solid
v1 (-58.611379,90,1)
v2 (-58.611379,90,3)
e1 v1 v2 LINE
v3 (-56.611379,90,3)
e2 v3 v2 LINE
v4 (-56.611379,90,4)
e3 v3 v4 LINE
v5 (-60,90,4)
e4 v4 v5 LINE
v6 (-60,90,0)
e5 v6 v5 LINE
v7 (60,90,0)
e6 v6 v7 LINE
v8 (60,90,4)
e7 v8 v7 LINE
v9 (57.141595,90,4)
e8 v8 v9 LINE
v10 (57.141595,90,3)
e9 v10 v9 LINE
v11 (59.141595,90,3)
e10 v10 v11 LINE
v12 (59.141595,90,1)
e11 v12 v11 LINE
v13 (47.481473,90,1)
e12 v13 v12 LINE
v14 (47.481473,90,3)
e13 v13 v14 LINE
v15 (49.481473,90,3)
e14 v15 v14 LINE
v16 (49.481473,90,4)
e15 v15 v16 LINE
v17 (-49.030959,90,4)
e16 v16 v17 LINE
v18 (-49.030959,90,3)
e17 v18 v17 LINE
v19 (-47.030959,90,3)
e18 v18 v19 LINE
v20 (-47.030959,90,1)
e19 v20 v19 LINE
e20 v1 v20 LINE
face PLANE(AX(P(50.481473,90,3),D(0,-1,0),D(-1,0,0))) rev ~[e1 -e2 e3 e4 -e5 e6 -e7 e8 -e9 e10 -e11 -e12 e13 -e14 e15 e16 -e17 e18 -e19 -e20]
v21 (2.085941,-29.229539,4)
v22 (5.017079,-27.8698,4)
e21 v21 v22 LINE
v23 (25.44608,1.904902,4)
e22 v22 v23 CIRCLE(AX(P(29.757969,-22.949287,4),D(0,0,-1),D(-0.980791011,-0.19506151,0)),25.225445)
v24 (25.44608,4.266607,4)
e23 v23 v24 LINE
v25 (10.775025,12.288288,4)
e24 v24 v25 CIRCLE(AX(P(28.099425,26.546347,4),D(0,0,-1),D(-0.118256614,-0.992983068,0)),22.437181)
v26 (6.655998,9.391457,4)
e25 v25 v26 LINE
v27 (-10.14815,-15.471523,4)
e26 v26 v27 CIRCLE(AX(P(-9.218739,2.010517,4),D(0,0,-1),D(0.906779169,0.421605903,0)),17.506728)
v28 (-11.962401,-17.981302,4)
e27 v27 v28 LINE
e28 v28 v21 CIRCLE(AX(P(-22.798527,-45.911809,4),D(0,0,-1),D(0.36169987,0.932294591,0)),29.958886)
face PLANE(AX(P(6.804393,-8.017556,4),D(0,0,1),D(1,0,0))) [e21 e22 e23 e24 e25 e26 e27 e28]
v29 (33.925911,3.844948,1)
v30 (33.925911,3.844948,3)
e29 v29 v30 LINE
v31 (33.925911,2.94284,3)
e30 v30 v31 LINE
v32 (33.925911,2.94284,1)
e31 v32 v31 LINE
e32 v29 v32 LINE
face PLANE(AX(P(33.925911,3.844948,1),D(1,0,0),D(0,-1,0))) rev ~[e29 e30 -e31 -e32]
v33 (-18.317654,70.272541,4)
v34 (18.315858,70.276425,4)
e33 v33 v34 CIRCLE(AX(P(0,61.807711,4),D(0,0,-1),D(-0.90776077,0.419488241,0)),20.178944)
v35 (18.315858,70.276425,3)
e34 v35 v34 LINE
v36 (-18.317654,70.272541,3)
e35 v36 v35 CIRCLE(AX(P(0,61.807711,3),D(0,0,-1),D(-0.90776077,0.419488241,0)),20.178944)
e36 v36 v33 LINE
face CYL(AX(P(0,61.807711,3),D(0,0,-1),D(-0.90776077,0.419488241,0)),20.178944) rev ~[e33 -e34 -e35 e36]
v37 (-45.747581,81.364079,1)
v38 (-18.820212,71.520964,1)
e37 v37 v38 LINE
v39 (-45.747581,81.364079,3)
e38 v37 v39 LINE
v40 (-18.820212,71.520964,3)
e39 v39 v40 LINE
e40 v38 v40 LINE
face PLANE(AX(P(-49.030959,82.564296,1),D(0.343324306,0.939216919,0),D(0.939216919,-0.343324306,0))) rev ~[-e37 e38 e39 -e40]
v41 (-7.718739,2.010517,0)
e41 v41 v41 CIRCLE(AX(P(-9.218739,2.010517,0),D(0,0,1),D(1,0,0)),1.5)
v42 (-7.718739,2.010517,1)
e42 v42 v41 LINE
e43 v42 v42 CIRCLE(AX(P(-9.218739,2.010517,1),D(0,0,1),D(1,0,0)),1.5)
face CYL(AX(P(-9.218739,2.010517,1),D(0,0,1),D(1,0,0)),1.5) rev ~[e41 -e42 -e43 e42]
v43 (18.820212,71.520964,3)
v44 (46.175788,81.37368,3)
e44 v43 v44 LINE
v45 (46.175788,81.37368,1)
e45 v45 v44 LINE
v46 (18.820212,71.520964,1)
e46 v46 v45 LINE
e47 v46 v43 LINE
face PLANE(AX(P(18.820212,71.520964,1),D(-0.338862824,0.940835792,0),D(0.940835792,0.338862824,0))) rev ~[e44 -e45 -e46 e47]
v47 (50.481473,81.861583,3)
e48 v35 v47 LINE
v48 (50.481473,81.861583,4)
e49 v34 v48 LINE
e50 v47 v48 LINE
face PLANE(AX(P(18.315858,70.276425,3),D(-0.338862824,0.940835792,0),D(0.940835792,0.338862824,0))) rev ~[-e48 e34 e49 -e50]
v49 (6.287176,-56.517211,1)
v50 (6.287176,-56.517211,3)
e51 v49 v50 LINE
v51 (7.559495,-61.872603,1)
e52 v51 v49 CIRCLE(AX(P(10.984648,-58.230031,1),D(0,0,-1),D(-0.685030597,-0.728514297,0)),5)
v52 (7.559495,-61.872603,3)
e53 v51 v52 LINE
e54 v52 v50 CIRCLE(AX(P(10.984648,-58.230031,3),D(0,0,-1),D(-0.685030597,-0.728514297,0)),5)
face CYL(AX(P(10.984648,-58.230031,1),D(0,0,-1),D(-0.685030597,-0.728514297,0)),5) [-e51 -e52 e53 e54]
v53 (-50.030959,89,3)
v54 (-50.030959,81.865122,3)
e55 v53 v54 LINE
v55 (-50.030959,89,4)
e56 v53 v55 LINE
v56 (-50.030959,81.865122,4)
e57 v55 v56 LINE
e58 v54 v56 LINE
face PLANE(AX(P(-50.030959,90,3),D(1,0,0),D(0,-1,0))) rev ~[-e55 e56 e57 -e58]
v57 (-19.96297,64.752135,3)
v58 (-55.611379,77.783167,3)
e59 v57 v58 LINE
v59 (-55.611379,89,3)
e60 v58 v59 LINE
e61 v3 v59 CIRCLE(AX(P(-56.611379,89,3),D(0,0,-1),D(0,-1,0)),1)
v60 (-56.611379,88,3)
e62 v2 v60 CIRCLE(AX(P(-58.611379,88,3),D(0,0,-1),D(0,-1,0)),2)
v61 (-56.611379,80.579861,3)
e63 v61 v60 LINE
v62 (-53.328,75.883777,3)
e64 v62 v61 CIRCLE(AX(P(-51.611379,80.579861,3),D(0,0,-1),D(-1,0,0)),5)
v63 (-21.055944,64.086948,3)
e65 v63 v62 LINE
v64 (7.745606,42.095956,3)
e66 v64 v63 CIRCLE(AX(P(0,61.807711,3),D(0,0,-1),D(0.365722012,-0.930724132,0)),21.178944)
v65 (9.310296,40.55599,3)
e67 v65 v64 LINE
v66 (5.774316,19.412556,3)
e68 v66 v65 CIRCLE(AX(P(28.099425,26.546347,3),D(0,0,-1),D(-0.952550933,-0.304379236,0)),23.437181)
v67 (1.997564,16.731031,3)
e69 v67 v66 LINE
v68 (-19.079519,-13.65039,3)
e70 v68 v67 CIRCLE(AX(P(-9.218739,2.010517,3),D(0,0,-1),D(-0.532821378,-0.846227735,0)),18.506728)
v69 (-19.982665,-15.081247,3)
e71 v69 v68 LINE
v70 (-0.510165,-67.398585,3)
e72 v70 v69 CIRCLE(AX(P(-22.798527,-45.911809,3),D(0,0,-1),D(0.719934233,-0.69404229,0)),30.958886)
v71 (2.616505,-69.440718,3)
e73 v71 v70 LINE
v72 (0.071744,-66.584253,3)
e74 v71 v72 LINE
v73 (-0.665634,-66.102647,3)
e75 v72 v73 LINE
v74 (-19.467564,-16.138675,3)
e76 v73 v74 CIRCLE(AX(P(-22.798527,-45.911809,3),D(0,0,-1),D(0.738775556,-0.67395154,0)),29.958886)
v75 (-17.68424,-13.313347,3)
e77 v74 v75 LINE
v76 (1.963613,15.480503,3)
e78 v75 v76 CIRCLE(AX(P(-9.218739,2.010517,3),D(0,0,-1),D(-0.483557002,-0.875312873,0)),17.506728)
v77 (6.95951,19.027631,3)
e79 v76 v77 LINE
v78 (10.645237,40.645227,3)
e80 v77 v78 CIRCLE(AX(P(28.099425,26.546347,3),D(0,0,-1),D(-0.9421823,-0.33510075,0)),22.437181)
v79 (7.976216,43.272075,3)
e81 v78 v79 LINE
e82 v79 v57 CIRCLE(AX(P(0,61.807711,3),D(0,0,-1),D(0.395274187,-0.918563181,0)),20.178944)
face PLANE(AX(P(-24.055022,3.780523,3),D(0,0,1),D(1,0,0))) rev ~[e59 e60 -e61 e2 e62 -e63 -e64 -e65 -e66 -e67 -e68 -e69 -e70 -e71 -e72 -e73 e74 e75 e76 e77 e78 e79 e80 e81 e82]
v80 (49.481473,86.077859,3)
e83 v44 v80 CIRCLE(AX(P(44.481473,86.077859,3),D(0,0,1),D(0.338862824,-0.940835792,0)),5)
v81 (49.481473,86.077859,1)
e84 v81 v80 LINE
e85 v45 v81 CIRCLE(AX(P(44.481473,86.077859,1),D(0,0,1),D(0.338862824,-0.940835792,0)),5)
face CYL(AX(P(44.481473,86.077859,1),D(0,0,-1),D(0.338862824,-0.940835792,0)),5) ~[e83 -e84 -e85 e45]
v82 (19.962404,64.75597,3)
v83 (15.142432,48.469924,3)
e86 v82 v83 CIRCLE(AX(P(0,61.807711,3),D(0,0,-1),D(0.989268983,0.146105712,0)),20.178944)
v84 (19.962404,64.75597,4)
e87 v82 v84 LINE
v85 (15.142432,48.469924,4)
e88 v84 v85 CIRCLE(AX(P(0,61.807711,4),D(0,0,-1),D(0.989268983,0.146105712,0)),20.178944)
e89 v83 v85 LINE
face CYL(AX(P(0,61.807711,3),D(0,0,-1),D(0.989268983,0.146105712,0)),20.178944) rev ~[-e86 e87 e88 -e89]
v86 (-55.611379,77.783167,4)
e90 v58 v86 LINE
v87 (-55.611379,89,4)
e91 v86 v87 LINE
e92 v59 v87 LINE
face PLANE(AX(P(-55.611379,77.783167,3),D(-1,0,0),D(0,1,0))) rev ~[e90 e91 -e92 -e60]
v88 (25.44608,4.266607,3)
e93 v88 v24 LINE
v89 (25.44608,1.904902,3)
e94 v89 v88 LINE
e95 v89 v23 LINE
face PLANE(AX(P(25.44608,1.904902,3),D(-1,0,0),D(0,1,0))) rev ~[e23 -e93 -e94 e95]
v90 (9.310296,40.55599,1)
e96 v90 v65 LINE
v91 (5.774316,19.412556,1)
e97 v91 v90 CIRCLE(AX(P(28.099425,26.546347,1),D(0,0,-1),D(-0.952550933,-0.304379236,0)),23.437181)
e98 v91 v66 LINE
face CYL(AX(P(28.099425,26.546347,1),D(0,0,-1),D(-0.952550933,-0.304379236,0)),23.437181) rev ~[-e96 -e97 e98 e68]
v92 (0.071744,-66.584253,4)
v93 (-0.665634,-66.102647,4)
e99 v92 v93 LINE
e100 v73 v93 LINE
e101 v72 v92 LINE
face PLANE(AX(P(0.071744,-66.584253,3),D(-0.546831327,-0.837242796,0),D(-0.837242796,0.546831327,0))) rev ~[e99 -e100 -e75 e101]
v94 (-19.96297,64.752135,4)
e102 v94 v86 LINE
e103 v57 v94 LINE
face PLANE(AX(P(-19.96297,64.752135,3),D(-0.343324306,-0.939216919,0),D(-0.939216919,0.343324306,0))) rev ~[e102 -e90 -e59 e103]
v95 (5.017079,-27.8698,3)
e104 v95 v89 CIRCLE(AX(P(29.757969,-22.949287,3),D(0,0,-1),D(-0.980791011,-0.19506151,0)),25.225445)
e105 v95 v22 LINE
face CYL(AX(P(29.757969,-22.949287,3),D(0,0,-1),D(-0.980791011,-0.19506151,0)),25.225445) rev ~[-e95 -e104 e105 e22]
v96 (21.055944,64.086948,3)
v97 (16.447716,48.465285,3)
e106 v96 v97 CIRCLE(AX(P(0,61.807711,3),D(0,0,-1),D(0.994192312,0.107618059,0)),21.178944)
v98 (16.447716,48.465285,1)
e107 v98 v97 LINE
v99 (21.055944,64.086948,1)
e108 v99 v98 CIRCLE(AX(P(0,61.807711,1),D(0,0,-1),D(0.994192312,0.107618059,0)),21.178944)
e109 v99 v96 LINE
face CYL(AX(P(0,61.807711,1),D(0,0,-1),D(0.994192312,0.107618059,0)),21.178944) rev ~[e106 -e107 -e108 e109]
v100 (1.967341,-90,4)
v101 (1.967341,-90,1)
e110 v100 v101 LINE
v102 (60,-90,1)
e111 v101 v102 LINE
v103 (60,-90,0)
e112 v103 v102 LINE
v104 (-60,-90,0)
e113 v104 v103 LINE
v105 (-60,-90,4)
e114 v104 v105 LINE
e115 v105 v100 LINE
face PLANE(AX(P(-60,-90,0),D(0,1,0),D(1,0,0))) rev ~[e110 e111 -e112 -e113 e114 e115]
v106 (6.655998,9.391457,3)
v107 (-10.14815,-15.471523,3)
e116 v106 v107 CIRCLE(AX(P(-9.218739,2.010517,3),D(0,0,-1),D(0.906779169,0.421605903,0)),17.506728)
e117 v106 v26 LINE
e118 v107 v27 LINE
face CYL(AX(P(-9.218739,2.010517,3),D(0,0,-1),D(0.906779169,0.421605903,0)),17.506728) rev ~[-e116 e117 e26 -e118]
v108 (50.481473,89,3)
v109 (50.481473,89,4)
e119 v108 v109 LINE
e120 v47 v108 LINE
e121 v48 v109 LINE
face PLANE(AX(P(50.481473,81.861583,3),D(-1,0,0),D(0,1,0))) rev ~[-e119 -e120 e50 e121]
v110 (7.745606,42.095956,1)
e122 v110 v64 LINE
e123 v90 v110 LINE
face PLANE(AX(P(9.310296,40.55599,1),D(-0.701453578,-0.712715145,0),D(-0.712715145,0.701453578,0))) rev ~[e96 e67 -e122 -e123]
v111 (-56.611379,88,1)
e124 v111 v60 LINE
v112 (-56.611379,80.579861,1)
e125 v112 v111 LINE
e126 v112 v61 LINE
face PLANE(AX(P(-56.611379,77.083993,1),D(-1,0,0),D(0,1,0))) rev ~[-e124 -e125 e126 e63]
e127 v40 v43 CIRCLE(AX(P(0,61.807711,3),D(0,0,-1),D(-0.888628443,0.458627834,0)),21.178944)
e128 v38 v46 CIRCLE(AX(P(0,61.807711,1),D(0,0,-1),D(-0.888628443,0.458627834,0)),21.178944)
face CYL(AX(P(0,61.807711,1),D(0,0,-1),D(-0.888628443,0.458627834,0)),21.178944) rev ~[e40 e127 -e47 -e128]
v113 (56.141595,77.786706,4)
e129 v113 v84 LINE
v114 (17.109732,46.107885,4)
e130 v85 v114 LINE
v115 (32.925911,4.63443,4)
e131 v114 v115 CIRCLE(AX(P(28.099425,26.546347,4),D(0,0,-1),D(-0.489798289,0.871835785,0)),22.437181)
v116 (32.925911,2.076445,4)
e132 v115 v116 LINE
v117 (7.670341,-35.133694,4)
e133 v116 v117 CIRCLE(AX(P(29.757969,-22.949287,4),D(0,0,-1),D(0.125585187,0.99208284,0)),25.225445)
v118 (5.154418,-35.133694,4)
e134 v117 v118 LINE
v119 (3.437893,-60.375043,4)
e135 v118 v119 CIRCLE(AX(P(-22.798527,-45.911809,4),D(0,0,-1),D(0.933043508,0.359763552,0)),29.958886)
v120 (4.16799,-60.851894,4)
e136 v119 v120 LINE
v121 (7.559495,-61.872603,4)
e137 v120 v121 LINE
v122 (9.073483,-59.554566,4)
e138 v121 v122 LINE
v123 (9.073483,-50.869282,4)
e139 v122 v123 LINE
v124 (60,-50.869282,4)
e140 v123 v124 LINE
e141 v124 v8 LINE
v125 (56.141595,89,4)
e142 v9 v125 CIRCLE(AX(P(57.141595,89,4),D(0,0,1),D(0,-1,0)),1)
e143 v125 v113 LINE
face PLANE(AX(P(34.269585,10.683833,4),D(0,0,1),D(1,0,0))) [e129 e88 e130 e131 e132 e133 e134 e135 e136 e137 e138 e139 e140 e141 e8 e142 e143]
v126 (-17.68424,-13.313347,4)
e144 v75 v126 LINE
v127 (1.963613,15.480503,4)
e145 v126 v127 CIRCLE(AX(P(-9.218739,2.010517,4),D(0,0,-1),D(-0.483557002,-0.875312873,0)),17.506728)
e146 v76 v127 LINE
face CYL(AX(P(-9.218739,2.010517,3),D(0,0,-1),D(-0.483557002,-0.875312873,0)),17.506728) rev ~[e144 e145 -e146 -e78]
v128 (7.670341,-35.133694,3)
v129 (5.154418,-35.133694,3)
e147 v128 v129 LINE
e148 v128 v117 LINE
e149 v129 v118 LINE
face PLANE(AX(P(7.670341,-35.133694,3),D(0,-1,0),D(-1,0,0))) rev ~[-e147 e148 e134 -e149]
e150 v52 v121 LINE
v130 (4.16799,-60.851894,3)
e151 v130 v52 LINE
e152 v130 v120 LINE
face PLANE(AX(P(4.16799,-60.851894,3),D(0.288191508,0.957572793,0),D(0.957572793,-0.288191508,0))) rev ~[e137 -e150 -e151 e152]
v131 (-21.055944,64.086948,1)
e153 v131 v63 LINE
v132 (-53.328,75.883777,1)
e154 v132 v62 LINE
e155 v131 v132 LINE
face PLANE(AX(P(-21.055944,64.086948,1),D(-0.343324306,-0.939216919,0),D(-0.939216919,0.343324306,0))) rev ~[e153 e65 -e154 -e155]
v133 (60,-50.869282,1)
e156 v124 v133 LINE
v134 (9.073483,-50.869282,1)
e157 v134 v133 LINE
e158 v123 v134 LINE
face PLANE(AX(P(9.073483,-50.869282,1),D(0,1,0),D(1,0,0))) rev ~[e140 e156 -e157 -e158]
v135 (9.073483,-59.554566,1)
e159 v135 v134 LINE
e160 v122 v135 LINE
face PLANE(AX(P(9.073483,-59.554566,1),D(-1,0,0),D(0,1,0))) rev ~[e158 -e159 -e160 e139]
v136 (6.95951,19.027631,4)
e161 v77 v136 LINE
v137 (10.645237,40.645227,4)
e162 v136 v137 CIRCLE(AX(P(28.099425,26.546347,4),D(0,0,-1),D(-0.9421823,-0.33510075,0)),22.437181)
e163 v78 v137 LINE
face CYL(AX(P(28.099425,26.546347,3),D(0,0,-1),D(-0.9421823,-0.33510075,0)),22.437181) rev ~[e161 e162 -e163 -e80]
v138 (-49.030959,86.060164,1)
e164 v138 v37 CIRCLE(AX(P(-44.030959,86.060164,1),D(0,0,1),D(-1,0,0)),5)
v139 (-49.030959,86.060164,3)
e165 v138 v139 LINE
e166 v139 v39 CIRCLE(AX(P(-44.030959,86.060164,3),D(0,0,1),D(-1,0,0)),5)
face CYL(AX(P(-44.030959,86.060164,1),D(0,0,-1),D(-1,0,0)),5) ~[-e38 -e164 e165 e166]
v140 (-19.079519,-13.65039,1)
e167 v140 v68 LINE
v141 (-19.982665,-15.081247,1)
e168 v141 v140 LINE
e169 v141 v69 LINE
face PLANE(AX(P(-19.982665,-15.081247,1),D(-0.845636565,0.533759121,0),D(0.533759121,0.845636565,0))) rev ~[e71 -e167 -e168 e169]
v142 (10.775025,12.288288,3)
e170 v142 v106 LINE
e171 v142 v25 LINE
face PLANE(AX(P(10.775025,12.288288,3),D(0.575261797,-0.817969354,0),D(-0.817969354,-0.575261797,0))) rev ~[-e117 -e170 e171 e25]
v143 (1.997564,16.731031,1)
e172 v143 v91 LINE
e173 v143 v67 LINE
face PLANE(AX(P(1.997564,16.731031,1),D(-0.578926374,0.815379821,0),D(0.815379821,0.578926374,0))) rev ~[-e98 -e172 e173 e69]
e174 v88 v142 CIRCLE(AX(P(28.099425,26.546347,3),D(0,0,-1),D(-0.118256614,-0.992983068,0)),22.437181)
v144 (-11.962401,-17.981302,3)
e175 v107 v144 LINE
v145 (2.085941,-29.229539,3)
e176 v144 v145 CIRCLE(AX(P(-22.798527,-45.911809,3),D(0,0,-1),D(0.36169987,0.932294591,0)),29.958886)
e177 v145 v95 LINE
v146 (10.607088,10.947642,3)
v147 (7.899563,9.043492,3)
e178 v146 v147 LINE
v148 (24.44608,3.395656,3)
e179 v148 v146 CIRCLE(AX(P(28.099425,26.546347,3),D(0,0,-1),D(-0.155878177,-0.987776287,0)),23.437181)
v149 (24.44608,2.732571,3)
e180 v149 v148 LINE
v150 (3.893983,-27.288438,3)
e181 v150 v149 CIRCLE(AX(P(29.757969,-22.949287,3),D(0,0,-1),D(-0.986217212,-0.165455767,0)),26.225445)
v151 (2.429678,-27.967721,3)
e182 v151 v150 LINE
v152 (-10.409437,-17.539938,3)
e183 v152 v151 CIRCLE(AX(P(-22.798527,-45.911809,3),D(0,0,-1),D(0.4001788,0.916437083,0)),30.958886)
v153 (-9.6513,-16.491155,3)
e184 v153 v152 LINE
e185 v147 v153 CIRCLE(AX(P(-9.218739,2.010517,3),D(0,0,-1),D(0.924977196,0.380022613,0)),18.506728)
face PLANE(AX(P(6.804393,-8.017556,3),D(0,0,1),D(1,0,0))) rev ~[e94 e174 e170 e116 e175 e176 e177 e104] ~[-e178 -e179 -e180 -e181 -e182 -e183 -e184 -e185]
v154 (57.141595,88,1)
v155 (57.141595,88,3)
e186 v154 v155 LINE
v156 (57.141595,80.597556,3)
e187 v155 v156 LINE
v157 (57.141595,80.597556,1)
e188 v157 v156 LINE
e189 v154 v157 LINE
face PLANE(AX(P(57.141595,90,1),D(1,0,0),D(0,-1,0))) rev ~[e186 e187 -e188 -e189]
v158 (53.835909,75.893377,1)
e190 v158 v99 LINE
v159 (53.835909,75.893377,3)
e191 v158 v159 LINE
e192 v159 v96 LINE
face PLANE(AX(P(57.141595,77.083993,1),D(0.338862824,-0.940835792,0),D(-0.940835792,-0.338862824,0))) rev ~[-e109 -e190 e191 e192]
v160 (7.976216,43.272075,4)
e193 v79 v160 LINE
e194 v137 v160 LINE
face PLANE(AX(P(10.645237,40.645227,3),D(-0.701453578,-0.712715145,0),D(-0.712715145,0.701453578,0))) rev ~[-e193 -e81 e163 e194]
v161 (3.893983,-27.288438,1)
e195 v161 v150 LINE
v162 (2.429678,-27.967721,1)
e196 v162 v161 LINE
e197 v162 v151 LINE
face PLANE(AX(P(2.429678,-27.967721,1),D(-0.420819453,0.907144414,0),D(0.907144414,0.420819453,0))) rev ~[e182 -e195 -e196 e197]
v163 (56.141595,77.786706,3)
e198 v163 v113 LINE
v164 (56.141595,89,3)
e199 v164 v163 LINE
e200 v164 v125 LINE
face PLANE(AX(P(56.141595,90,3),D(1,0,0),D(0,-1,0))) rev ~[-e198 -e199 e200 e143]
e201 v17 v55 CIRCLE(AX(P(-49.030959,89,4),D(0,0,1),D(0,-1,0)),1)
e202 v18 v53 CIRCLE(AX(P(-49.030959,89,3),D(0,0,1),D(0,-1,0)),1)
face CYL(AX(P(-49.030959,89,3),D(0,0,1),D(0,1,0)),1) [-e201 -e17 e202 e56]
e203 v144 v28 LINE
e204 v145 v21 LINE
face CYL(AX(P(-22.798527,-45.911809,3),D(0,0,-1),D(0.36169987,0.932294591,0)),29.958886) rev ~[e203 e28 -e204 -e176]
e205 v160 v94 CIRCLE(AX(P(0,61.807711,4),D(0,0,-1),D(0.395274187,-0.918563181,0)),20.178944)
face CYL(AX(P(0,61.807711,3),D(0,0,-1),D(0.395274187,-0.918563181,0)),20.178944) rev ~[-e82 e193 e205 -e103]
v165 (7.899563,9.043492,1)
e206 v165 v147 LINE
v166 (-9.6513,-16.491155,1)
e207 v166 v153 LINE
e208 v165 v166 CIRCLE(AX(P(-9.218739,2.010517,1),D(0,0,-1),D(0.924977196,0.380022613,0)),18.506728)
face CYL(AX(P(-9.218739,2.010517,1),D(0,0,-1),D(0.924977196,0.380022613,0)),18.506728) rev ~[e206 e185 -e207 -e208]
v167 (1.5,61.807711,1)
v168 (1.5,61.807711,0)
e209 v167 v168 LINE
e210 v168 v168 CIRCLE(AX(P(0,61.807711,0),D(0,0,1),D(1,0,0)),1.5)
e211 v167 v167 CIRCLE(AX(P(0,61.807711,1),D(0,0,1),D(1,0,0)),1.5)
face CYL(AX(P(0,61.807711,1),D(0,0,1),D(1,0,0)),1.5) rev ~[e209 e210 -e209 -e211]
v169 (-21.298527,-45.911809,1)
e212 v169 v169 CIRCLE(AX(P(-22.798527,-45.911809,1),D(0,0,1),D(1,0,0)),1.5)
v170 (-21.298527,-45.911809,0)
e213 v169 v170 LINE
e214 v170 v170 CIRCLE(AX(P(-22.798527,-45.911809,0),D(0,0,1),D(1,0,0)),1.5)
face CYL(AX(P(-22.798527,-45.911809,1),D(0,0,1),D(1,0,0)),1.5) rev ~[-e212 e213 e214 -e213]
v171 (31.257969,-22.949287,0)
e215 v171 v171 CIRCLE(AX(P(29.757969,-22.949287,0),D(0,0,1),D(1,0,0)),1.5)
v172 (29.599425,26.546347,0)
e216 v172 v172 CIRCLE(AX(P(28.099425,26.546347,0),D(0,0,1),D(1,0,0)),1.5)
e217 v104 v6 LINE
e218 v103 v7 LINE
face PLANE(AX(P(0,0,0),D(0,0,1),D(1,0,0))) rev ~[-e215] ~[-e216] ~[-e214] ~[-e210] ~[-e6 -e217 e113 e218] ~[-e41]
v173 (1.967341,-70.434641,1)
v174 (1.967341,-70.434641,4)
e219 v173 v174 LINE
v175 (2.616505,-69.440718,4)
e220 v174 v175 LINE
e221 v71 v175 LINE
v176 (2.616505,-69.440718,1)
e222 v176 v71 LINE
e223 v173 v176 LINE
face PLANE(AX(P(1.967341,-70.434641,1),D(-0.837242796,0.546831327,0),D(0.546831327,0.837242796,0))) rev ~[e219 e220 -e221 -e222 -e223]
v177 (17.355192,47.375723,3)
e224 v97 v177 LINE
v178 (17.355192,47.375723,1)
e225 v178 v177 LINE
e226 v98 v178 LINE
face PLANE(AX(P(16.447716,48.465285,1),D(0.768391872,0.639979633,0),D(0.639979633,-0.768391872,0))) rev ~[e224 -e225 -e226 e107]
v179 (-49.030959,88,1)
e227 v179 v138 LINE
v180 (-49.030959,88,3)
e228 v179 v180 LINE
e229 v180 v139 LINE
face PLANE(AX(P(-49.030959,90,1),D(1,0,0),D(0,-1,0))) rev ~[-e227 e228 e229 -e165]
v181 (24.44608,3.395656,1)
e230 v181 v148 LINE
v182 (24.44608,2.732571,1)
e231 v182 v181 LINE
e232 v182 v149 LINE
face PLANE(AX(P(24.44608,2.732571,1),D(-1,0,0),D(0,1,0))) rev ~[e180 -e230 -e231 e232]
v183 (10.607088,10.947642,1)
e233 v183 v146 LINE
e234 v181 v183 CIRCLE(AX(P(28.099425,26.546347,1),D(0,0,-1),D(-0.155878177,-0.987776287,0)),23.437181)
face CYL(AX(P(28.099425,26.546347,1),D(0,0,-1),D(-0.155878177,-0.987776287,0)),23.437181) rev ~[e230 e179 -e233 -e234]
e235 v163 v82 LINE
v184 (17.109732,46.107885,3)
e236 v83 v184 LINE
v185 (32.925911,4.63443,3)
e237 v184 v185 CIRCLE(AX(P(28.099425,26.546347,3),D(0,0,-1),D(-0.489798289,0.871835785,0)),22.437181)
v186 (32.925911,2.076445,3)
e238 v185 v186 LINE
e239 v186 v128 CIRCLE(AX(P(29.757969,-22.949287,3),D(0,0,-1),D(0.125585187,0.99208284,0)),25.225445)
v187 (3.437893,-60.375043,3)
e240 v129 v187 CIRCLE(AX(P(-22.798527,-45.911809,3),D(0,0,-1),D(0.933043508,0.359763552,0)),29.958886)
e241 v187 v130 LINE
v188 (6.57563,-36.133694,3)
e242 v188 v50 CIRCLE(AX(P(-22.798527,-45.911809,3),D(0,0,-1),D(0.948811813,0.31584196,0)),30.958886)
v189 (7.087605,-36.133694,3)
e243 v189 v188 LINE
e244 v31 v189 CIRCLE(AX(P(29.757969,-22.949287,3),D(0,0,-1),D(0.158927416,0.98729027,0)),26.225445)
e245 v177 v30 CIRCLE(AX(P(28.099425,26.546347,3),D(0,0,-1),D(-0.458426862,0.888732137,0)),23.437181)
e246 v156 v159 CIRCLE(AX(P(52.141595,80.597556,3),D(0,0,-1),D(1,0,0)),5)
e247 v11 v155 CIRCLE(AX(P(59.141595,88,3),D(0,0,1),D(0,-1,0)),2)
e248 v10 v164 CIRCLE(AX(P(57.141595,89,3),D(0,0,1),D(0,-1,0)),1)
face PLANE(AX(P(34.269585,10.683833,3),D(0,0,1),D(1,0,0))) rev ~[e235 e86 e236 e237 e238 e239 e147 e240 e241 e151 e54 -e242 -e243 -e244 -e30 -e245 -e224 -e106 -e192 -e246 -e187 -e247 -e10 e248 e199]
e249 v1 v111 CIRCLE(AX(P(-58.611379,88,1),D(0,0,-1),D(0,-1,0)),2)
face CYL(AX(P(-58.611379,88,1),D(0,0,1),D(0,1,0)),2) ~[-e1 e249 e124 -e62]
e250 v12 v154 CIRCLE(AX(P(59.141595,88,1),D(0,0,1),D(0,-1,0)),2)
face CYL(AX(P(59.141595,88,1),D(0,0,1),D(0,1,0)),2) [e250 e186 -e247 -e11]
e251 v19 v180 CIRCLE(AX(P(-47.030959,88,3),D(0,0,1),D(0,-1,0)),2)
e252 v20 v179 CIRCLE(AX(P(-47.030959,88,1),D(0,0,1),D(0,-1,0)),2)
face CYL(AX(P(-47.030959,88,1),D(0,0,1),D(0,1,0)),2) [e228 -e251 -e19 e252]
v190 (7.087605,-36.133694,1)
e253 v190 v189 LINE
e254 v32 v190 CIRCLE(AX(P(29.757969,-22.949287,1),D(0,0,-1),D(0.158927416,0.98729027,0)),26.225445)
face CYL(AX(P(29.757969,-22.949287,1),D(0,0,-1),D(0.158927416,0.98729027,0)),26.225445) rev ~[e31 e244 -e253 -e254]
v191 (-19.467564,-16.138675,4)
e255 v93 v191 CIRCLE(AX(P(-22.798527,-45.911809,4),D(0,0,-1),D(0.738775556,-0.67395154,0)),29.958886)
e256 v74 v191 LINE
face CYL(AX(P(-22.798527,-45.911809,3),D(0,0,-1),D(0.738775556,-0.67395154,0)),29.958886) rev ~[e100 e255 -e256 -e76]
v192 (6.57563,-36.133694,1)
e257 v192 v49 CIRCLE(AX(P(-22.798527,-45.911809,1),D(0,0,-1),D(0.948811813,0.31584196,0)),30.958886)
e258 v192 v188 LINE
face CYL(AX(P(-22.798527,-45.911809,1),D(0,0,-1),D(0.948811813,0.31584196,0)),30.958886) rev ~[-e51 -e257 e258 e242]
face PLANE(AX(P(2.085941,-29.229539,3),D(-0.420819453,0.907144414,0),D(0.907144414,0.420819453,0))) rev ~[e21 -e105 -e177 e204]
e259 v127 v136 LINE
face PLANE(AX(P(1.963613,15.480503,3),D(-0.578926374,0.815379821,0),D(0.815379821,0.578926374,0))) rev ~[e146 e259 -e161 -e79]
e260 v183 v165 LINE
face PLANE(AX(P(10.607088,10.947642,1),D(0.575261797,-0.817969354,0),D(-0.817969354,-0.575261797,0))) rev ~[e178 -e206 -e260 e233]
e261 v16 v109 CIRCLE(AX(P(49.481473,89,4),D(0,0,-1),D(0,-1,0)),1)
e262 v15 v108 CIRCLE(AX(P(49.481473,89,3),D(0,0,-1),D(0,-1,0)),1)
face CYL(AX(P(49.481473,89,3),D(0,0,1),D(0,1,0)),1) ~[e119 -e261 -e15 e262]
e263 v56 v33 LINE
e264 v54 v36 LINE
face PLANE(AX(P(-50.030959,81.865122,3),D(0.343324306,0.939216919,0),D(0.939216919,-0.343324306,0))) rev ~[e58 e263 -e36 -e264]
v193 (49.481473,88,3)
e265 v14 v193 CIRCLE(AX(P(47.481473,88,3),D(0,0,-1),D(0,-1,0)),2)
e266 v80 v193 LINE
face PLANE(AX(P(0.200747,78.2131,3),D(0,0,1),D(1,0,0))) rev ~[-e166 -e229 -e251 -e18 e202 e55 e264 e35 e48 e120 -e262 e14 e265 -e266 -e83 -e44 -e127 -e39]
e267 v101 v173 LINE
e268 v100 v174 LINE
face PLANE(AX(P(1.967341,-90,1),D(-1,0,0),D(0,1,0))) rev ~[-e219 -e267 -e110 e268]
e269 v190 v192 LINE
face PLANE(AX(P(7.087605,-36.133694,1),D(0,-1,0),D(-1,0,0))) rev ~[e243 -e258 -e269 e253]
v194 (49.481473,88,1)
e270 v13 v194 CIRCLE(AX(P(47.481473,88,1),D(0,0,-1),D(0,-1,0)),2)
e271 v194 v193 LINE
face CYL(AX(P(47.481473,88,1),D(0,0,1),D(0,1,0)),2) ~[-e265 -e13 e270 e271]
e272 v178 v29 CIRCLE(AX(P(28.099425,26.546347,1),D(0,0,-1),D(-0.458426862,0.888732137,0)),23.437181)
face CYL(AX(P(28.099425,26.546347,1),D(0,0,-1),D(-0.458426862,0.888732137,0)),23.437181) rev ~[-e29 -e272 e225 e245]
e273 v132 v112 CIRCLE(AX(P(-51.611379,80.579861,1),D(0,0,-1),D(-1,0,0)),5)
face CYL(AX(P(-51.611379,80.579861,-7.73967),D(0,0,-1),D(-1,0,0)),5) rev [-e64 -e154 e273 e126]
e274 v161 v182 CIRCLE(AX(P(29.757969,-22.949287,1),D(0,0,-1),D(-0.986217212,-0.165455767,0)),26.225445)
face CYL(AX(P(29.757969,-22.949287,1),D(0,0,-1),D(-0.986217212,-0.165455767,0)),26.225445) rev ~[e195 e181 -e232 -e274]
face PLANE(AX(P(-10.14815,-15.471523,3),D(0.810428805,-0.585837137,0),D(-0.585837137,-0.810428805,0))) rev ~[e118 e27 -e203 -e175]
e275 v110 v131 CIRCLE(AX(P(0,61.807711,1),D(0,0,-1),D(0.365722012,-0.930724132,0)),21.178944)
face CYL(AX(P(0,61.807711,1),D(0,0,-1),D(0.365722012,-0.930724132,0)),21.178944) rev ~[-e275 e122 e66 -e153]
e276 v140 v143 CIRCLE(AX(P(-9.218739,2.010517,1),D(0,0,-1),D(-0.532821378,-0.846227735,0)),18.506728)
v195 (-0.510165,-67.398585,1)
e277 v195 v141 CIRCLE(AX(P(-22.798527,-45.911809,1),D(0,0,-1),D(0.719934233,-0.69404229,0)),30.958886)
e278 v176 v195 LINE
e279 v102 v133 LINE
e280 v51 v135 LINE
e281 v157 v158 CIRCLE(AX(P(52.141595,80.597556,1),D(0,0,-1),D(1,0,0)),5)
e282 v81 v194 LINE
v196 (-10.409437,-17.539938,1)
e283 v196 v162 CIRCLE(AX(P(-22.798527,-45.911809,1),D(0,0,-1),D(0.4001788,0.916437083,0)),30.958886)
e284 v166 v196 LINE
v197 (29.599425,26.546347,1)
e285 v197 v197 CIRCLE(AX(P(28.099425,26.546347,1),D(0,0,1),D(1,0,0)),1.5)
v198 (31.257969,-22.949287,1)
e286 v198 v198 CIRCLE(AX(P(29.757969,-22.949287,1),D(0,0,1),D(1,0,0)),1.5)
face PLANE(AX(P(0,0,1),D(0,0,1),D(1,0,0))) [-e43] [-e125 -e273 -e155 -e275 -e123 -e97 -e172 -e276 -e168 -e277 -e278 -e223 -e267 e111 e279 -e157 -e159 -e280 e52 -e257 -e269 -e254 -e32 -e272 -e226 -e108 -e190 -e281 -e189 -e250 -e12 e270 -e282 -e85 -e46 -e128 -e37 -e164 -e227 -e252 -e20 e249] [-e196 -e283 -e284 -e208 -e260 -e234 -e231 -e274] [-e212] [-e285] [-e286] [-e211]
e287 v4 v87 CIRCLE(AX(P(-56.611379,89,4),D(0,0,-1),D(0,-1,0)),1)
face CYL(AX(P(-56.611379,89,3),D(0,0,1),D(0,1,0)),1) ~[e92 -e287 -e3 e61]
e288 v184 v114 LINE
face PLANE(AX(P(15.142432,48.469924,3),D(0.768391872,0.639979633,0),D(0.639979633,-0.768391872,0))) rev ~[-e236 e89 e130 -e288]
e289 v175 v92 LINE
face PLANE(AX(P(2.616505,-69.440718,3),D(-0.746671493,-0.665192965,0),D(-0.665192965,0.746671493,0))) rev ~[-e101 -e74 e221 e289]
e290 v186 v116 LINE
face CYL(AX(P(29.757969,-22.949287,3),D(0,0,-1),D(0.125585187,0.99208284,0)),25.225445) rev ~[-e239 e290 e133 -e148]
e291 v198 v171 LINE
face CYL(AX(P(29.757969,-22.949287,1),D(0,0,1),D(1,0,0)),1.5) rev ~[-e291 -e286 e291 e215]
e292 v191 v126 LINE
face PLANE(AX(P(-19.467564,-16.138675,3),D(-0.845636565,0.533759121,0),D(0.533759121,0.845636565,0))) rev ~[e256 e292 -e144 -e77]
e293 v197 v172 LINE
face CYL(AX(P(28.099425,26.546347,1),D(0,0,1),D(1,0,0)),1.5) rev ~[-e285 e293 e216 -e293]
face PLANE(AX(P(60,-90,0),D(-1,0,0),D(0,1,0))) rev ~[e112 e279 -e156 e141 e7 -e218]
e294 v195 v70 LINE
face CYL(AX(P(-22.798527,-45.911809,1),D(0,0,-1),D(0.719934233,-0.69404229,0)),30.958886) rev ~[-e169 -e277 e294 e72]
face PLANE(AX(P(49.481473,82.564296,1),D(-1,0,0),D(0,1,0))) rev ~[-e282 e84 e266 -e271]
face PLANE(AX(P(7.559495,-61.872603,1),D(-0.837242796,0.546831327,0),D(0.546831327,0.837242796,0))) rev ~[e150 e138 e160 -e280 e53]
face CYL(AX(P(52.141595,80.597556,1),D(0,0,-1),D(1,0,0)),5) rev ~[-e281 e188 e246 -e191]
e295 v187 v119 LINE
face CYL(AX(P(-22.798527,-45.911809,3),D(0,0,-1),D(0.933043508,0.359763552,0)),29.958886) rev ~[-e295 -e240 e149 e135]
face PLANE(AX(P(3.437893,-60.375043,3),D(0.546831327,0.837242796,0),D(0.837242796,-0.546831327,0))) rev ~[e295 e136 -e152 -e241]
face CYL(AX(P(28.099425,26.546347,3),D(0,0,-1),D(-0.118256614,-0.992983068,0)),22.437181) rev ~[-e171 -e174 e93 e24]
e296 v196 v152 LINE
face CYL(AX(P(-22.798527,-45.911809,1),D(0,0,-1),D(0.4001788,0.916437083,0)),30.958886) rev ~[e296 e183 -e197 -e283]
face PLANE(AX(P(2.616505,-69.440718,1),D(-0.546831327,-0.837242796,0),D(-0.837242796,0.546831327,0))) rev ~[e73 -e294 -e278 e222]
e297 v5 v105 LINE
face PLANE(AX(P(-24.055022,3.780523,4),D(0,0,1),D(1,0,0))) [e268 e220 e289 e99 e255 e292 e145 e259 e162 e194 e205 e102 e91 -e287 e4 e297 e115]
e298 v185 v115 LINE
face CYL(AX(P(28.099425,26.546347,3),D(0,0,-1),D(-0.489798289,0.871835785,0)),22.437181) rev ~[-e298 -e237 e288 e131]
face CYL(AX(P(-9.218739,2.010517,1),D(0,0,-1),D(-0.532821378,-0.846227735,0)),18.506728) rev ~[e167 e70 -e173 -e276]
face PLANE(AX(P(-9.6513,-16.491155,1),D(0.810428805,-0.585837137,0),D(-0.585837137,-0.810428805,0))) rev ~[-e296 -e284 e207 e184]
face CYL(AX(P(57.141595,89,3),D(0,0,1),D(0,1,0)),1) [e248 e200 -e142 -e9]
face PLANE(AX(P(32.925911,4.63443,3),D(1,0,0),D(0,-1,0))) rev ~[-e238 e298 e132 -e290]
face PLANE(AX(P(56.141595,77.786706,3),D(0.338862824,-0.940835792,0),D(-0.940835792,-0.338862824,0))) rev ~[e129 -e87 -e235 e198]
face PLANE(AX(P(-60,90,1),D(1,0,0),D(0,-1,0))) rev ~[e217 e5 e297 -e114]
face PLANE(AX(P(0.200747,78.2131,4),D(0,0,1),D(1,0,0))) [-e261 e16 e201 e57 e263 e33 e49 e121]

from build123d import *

# Parameters (mm, degrees)
F0_W          = 120
F0_H          = 180
F1_DEPTH      = 1
F3_DEPTH      = 2
F4_R          = 1.5
F5_DEPTH      = 1
F7_DEPTH      = 1
F8_R          = 1
F9_R          = 2
F10_T4_DEPTH  = 19.4793405237
F10_T10_DEPTH = 10.7839076458
F10_T12_DEPTH = 2
F10_T14_DEPTH = 2
F10_T16_DEPTH = 2


# Not quite as in the source:
# - a fillet or chamfer that OpenCascade refuses, or shapes differently, is made with other operations: its cross-section is extruded or revolved along the edge and cut away or added


with BuildPart() as f1:
    # F0 (on Top) → F1 (new body)
    with BuildSketch(Plane.XY):
        Rectangle(F0_W, F0_H)
    extrude(amount=F1_DEPTH)

    # F2 (on face) → F3 (join)
    with BuildSketch(Plane.XY.offset(1)):
        with BuildLine():
            ThreePointArc((5.7743163641, 19.4125560874), (4.9832762743, 30.4122392819), (9.3102960102, 40.5559898216))
            Line((9.3102960102, 40.5559898216), (7.7456061238, 42.095956144))
            ThreePointArc((7.7456061238, 42.095956144), (-12.8527116408, 44.9745444723), (-21.0559435865, 64.086947543))
            Line((-21.0559435865, 64.086947543), (-56.6113785743, 77.083993049))
            Line((-56.6113785743, 77.083993049), (-56.6113785743, 90))
            Line((-56.6113785743, 90), (-60, 90))
            Line((-60, 90), (-60, -90))
            Line((-60, -90), (1.9673409406, -90))
            Line((1.9673409406, -90), (1.9673409406, -70.4346411675))
            Line((1.9673409406, -70.4346411675), (2.616505266, -69.4407183096))
            Line((2.616505266, -69.4407183096), (-0.5101646957, -67.3985853814))
            ThreePointArc((-0.5101646957, -67.3985853814), (-51.8128586727, -56.7109367212), (-19.9826654378, -15.0812472939))
            Line((-19.9826654378, -15.0812472939), (-19.0795193014, -13.6503895026))
            ThreePointArc((-19.0795193014, -13.6503895026), (-24.4245614448, 12.5595430325), (1.9975642587, 16.731031054))
            Line((1.9975642587, 16.731031054), (5.7743163641, 19.4125560874))
        make_face()
        with BuildLine():
            ThreePointArc((3.893983022, -27.2884377194), (8.1177507192, -8.1345994764), (24.4460798679, 2.7325712784))
            Line((24.4460798679, 2.7325712784), (24.4460798679, 3.3956557663))
            ThreePointArc((24.4460798679, 3.3956557663), (16.8725336469, 5.9731034829), (10.6070882692, 10.9476419853))
            Line((10.6070882692, 10.9476419853), (7.8995626137, 9.0434923179))
            ThreePointArc((7.8995626137, 9.0434923179), (6.0327541508, -8.4723711354), (-9.6512998226, -16.4911551649))
            Line((-9.6512998226, -16.4911551649), (-10.4094366834, -17.5399380287))
            ThreePointArc((-10.4094366834, -17.5399380287), (-3.2805892037, -21.8805224353), (2.4296782432, -27.9677208929))
            Line((2.4296782432, -27.9677208929), (3.893983022, -27.2884377194))
        make_face()
        with BuildLine():
            Line((57.1415945888, 77.083993049), (21.0559435865, 64.086947543))
            ThreePointArc((21.0559435865, 64.086947543), (20.3135472344, 55.8154256572), (16.4477156209, 48.4652846663))
            Line((16.4477156209, 48.4652846663), (17.3551916053, 47.3757231641))
            ThreePointArc((17.3551916053, 47.3757231641), (50.0032635247, 34.8844107262), (33.9259108744, 3.8449484526))
            Line((33.9259108744, 3.8449484526), (33.9259108744, 2.9428404548))
            ThreePointArc((33.9259108744, 2.9428404548), (51.375757227, -37.7966835864), (7.0876050588, -36.1336939998))
            Line((7.0876050588, -36.1336939998), (6.5756302201, -36.1336939998))
            ThreePointArc((6.5756302201, -36.1336939998), (8.0704516148, -48.269522221), (4.7498989473, -60.0375614629))
            Line((4.7498989473, -60.0375614629), (7.5594950835, -61.8726028504))
            Line((7.5594950835, -61.8726028504), (9.0734828264, -59.5545656979))
            Line((9.0734828264, -59.5545656979), (9.0734828264, -50.869282335))
            Line((9.0734828264, -50.869282335), (60, -50.869282335))
            Line((60, -50.869282335), (60, 90))
            Line((60, 90), (57.1415945888, 90))
            Line((57.1415945888, 90), (57.1415945888, 77.083993049))
        make_face()
        with BuildLine():
            Line((-49.0309594103, 82.5642955171), (-18.820212287, 71.520964019))
            ThreePointArc((-18.820212287, 71.520964019), (0, 82.9866549619), (18.820212287, 71.520964019))
            Line((18.820212287, 71.520964019), (49.4814734299, 82.5642955171))
            Line((49.4814734299, 82.5642955171), (49.4814734299, 90))
            Line((49.4814734299, 90), (-49.0309594103, 90))
            Line((-49.0309594103, 90), (-49.0309594103, 82.5642955171))
        make_face()
    extrude(amount=F3_DEPTH)

    # F4 (on face) → F5 (cut, through all)
    with BuildSketch(Plane.XY.offset(1)):
        with Locations((-9.2187389006, 2.0105171313)):
            Circle(F4_R)
        with Locations((29.7579686112, -22.9492865482)):
            Circle(F4_R)
        with Locations((-22.7985265463, -45.9118092327)):
            Circle(F4_R)
        with Locations((28.0994249015, 26.5463472953)):
            Circle(F4_R)
        with Locations((0, 61.8077106774)):
            Circle(F4_R)
    extrude(amount=-F5_DEPTH, mode=Mode.SUBTRACT)

    # F6 (on face) → F7 (join)
    with BuildSketch(Plane.XY.offset(3)):
        with BuildLine():
            Line((-50.0309594103, 81.8651218962), (-18.3176540037, 70.2725405185))
            ThreePointArc((-18.3176540037, 70.2725405185), (-0.0021397414, 81.9866548485), (18.315858399, 70.2764250748))
            Line((18.315858399, 70.2764250748), (50.4814734299, 81.8615829055))
            Line((50.4814734299, 81.8615829055), (50.4814734299, 89))
            Line((50.4814734299, 89), (50.4814734299, 90))
            Line((50.4814734299, 90), (49.4814734299, 90))
            Line((49.4814734299, 90), (49.4814734299, 82.5642955171))
            Line((49.4814734299, 82.5642955171), (18.820212287, 71.520964019))
            ThreePointArc((18.820212287, 71.520964019), (0, 82.9866549619), (-18.820212287, 71.520964019))
            Line((-18.820212287, 71.520964019), (-49.0309594103, 82.5642955171))
            Line((-49.0309594103, 82.5642955171), (-49.0309594103, 90))
            Line((-49.0309594103, 90), (-50.0309594103, 90))
            Line((-50.0309594103, 90), (-50.0309594103, 89))
            Line((-50.0309594103, 89), (-50.0309594103, 81.8651218962))
        make_face()
        with BuildLine():
            ThreePointArc((-0.6656338746, -66.1026465903), (-50.8378132857, -56.4632664954), (-19.4675641491, -16.1386746862))
            Line((-19.4675641491, -16.1386746862), (-17.6842398721, -13.313347385))
            ThreePointArc((-17.6842398721, -13.313347385), (-23.6796095533, 11.8780776394), (1.9636133622, 15.4805033335))
            Line((1.9636133622, 15.4805033335), (6.9595101943, 19.0276311422))
            ThreePointArc((6.9595101943, 19.0276311422), (5.9814163542, 30.3173928166), (10.6452370769, 40.6452271729))
            Line((10.6452370769, 40.6452271729), (7.9762157892, 43.2720754273))
            ThreePointArc((7.9762157892, 43.2720754273), (-12.2991385331, 45.8101801247), (-19.9629696392, 64.752135175))
            Line((-19.9629696392, 64.752135175), (-55.6113785743, 77.78316667))
            Line((-55.6113785743, 77.78316667), (-55.6113785743, 89))
            Line((-55.6113785743, 89), (-55.6113785743, 90))
            Line((-55.6113785743, 90), (-56.6113785743, 90))
            Line((-56.6113785743, 90), (-56.6113785743, 77.083993049))
            Line((-56.6113785743, 77.083993049), (-21.0559435865, 64.086947543))
            ThreePointArc((-21.0559435865, 64.086947543), (-12.8527116408, 44.9745444723), (7.7456061238, 42.095956144))
            Line((7.7456061238, 42.095956144), (9.3102960102, 40.5559898216))
            ThreePointArc((9.3102960102, 40.5559898216), (4.9832762743, 30.4122392819), (5.7743163641, 19.4125560874))
            Line((5.7743163641, 19.4125560874), (1.9975642587, 16.731031054))
            ThreePointArc((1.9975642587, 16.731031054), (-24.4245614448, 12.5595430325), (-19.0795193014, -13.6503895026))
            Line((-19.0795193014, -13.6503895026), (-19.9826654378, -15.0812472939))
            ThreePointArc((-19.9826654378, -15.0812472939), (-51.8128586727, -56.7109367212), (-0.5101646957, -67.3985853814))
            Line((-0.5101646957, -67.3985853814), (2.616505266, -69.4407183096))
            Line((2.616505266, -69.4407183096), (0.0717437619, -66.5842526346))
            Line((0.0717437619, -66.5842526346), (-0.6656338746, -66.1026465903))
        make_face()
        with BuildLine():
            Line((56.1415945888, 89), (56.1415945888, 77.7867056607))
            Line((56.1415945888, 77.7867056607), (19.9624036934, 64.7559696929))
            ThreePointArc((19.9624036934, 64.7559696929), (19.3493201754, 56.0811409197), (15.142432038, 48.4699243388))
            Line((15.142432038, 48.4699243388), (17.1097320999, 46.1078845188))
            ThreePointArc((17.1097320999, 46.1078845188), (49.0638742633, 34.5412800266), (32.9259108744, 4.6344299996))
            Line((32.9259108744, 4.6344299996), (32.9259108744, 2.0764449012))
            ThreePointArc((32.9259108744, 2.0764449012), (50.6298931929, -37.115650126), (7.6703406758, -35.1336939998))
            Line((7.6703406758, -35.1336939998), (5.1544175427, -35.1336939998))
            ThreePointArc((5.1544175427, -35.1336939998), (7.0913247793, -47.9444525735), (3.4378931049, -60.3750431417))
            Line((3.4378931049, -60.3750431417), (4.1679904898, -60.8518942097))
            Line((4.1679904898, -60.8518942097), (7.5594950835, -61.8726028504))
            Line((7.5594950835, -61.8726028504), (4.7498989473, -60.0375614629))
            ThreePointArc((4.7498989473, -60.0375614629), (8.0704516148, -48.269522221), (6.5756302201, -36.1336939998))
            Line((6.5756302201, -36.1336939998), (7.0876050588, -36.1336939998))
            ThreePointArc((7.0876050588, -36.1336939998), (51.375757227, -37.7966835864), (33.9259108744, 2.9428404548))
            Line((33.9259108744, 2.9428404548), (33.9259108744, 3.8449484526))
            ThreePointArc((33.9259108744, 3.8449484526), (50.0032635247, 34.8844107262), (17.3551916053, 47.3757231641))
            Line((17.3551916053, 47.3757231641), (16.4477156209, 48.4652846663))
            ThreePointArc((16.4477156209, 48.4652846663), (20.3135472344, 55.8154256572), (21.0559435865, 64.086947543))
            Line((21.0559435865, 64.086947543), (57.1415945888, 77.083993049))
            Line((57.1415945888, 77.083993049), (57.1415945888, 90))
            Line((57.1415945888, 90), (56.1415945888, 90))
            Line((56.1415945888, 90), (56.1415945888, 89))
        make_face()
        with BuildLine():
            ThreePointArc((5.0170785682, -27.8698000011), (8.9577471086, -8.6778508038), (25.4460798679, 1.9049023991))
            Line((25.4460798679, 1.9049023991), (25.4460798679, 4.2666065752))
            ThreePointArc((25.4460798679, 4.2666065752), (17.3353913395, 6.8597359084), (10.7750248604, 12.2882881835))
            Line((10.7750248604, 12.2882881835), (6.6559975083, 9.3914570689))
            ThreePointArc((6.6559975083, 9.3914570689), (5.2858338993, -7.7926914407), (-10.1481498654, -15.4715229576))
            Line((-10.1481498654, -15.4715229576), (-11.9624013743, -17.9813018532))
            ThreePointArc((-11.9624013743, -17.9813018532), (-4.073652887, -22.5256176304), (2.0859408263, -29.2295391594))
            Line((2.0859408263, -29.2295391594), (5.0170785682, -27.8698000011))
        make_face()
        with BuildLine():
            ThreePointArc((10.6070882692, 10.9476419853), (16.8725336469, 5.9731034829), (24.4460798679, 3.3956557663))
            Line((24.4460798679, 3.3956557663), (24.4460798679, 2.7325712784))
            ThreePointArc((24.4460798679, 2.7325712784), (8.1177507192, -8.1345994764), (3.893983022, -27.2884377194))
            Line((3.893983022, -27.2884377194), (2.4296782432, -27.9677208929))
            ThreePointArc((2.4296782432, -27.9677208929), (-3.2805892037, -21.8805224353), (-10.4094366834, -17.5399380287))
            Line((-10.4094366834, -17.5399380287), (-9.6512998226, -16.4911551649))
            ThreePointArc((-9.6512998226, -16.4911551649), (6.0327541508, -8.4723711354), (7.8995626137, 9.0434923179))
            Line((7.8995626137, 9.0434923179), (10.6070882692, 10.9476419853))
        make_face(mode=Mode.SUBTRACT)
        with BuildLine():
            Line((49.4814734299, 90), (-49.0309594103, 90))
            Line((-49.0309594103, 90), (-49.0309594103, 82.5642955171))
            Line((-49.0309594103, 82.5642955171), (-18.820212287, 71.520964019))
            ThreePointArc((-18.820212287, 71.520964019), (0, 82.9866549619), (18.820212287, 71.520964019))
            Line((18.820212287, 71.520964019), (49.4814734299, 82.5642955171))
            Line((49.4814734299, 82.5642955171), (49.4814734299, 90))
        make_face()
        with BuildLine():
            Line((60, 90), (57.1415945888, 90))
            Line((57.1415945888, 90), (57.1415945888, 77.083993049))
            Line((57.1415945888, 77.083993049), (21.0559435865, 64.086947543))
            ThreePointArc((21.0559435865, 64.086947543), (20.3135472344, 55.8154256572), (16.4477156209, 48.4652846663))
            Line((16.4477156209, 48.4652846663), (17.3551916053, 47.3757231641))
            ThreePointArc((17.3551916053, 47.3757231641), (50.0032635247, 34.8844107262), (33.9259108744, 3.8449484526))
            Line((33.9259108744, 3.8449484526), (33.9259108744, 2.9428404548))
            ThreePointArc((33.9259108744, 2.9428404548), (51.375757227, -37.7966835864), (7.0876050588, -36.1336939998))
            Line((7.0876050588, -36.1336939998), (6.5756302201, -36.1336939998))
            ThreePointArc((6.5756302201, -36.1336939998), (8.0704516148, -48.269522221), (4.7498989473, -60.0375614629))
            Line((4.7498989473, -60.0375614629), (7.5594950835, -61.8726028504))
            Line((7.5594950835, -61.8726028504), (9.0734828264, -59.5545656979))
            Line((9.0734828264, -59.5545656979), (9.0734828264, -50.869282335))
            Line((9.0734828264, -50.869282335), (60, -50.869282335))
            Line((60, -50.869282335), (60, 90))
        make_face()
        with BuildLine():
            Line((1.9673409406, -70.4346411675), (2.616505266, -69.4407183096))
            Line((2.616505266, -69.4407183096), (-0.5101646957, -67.3985853814))
            ThreePointArc((-0.5101646957, -67.3985853814), (-51.8128586727, -56.7109367212), (-19.9826654378, -15.0812472939))
            Line((-19.9826654378, -15.0812472939), (-19.0795193014, -13.6503895026))
            ThreePointArc((-19.0795193014, -13.6503895026), (-24.4245614448, 12.5595430325), (1.9975642587, 16.731031054))
            Line((1.9975642587, 16.731031054), (5.7743163641, 19.4125560874))
            ThreePointArc((5.7743163641, 19.4125560874), (4.9832762743, 30.4122392819), (9.3102960102, 40.5559898216))
            Line((9.3102960102, 40.5559898216), (7.7456061238, 42.095956144))
            ThreePointArc((7.7456061238, 42.095956144), (-12.8527116408, 44.9745444723), (-21.0559435865, 64.086947543))
            Line((-21.0559435865, 64.086947543), (-56.6113785743, 77.083993049))
            Line((-56.6113785743, 77.083993049), (-56.6113785743, 90))
            Line((-56.6113785743, 90), (-60, 90))
            Line((-60, 90), (-60, -90))
            Line((-60, -90), (1.9673409406, -90))
            Line((1.9673409406, -90), (1.9673409406, -70.4346411675))
        make_face()
        with BuildLine():
            Line((24.4460798679, 2.7325712784), (24.4460798679, 3.3956557663))
            ThreePointArc((24.4460798679, 3.3956557663), (16.8725336469, 5.9731034829), (10.6070882692, 10.9476419853))
            Line((10.6070882692, 10.9476419853), (7.8995626137, 9.0434923179))
            ThreePointArc((7.8995626137, 9.0434923179), (6.0327541508, -8.4723711354), (-9.6512998226, -16.4911551649))
            Line((-9.6512998226, -16.4911551649), (-10.4094366834, -17.5399380287))
            ThreePointArc((-10.4094366834, -17.5399380287), (-3.2805892037, -21.8805224353), (2.4296782432, -27.9677208929))
            Line((2.4296782432, -27.9677208929), (3.893983022, -27.2884377194))
            ThreePointArc((3.893983022, -27.2884377194), (8.1177507192, -8.1345994764), (24.4460798679, 2.7325712784))
        make_face()
    extrude(amount=F7_DEPTH)

    # F8
    f8_edges = [f1.edges().sort_by_distance(p)[0] for p in [
        (-50.030959, 90, 3.5),
        (-55.611379, 90, 3.5),
        (56.141595, 90, 3.5),
        (50.481473, 90, 3.5),
    ]]
    fillet(f8_edges, radius=F8_R)

    # F9
    f9_edges = [f1.edges().sort_by_distance(p)[0] for p in [
        (-56.611379, 90, 2),
        (-49.030959, 90, 2),
        (49.481473, 90, 2),
        (57.141595, 90, 2),
    ]]
    fillet(f9_edges, radius=F9_R)

    # F10: fillet of radius 5 on 5 edges, made by hand


with BuildPart() as f10_tool2:
    # F10_s3 → F10_t4 (new body)
    with BuildSketch(Plane.XY.offset(-7.7396702619)):
        with BuildLine():
            ThreePointArc((-56.6113785743, 80.5798611538), (-55.7091284231, 77.7148225542), (-53.3280001036, 75.8837765586))
            Line((-53.3280001036, 75.8837765586), (-56.6113785743, 77.083993049))
            Line((-56.6113785743, 77.083993049), (-56.6113785743, 80.5798611538))
        make_face()
    extrude(amount=F10_T4_DEPTH)

    split(bisect_by=Plane.XY.offset(4), keep=Keep.BOTTOM)

    split(bisect_by=Plane.XY, keep=Keep.TOP)


with BuildPart() as f1_1:
    add(f1.part)

    # F10_t1: union F10_tool2
    add(f10_tool2.part)


with BuildPart() as f10_tool8:
    # F10_s9 → F10_t10 (new body)
    with BuildSketch(Plane.XY.offset(1)):
        with BuildLine():
            ThreePointArc((57.1415945888, 80.5975561073), (56.2325340038, 77.7228013869), (53.8359087076, 75.8933771496))
            Line((53.8359087076, 75.8933771496), (57.1415945888, 77.083993049))
            Line((57.1415945888, 77.083993049), (57.1415945888, 80.5975561073))
        make_face()
    extrude(amount=F10_T10_DEPTH)

    split(bisect_by=Plane.XY.offset(4), keep=Keep.BOTTOM)


with BuildPart() as f1_2:
    add(f1_1.part)

    # F10_t7: union F10_tool8
    add(f10_tool8.part)

    # F10_s13 → F10_t12 (cut)
    with BuildSketch(Plane.XY.offset(1)):
        with BuildLine():
            ThreePointArc((-49.0309594103, 86.0601636219), (-48.1287092591, 83.1951250224), (-45.7475809396, 81.3640790267))
            Line((-45.7475809396, 81.3640790267), (-49.0309594103, 82.5642955171))
            Line((-49.0309594103, 82.5642955171), (-49.0309594103, 86.0601636219))
        make_face()
    extrude(amount=F10_T12_DEPTH, mode=Mode.SUBTRACT)

    # F10_s15 → F10_t14 (cut)
    with BuildSketch(Plane.XY.offset(1)):
        with BuildLine():
            ThreePointArc((46.1757875488, 81.3736796177), (48.5724128449, 83.203103855), (49.4814734299, 86.0778585754))
            Line((49.4814734299, 86.0778585754), (49.4814734299, 82.5642955171))
            Line((49.4814734299, 82.5642955171), (46.1757875488, 81.3736796177))
        make_face()
    extrude(amount=F10_T14_DEPTH, mode=Mode.SUBTRACT)

    # F10_s17 → F10_t16 (cut)
    with BuildSketch(Plane.XY.offset(1)):
        with BuildLine():
            ThreePointArc((7.5594950835, -61.8726028504), (6.1200498347, -59.3857493388), (6.2871757091, -56.5172110429))
            ThreePointArc((6.2871757091, -56.5172110429), (5.5731904135, -58.3012523196), (4.7498989473, -60.0375614629))
            Line((4.7498989473, -60.0375614629), (7.5594950835, -61.8726028504))
        make_face()
    extrude(amount=F10_T16_DEPTH, mode=Mode.SUBTRACT)


solid = f1_2.part
